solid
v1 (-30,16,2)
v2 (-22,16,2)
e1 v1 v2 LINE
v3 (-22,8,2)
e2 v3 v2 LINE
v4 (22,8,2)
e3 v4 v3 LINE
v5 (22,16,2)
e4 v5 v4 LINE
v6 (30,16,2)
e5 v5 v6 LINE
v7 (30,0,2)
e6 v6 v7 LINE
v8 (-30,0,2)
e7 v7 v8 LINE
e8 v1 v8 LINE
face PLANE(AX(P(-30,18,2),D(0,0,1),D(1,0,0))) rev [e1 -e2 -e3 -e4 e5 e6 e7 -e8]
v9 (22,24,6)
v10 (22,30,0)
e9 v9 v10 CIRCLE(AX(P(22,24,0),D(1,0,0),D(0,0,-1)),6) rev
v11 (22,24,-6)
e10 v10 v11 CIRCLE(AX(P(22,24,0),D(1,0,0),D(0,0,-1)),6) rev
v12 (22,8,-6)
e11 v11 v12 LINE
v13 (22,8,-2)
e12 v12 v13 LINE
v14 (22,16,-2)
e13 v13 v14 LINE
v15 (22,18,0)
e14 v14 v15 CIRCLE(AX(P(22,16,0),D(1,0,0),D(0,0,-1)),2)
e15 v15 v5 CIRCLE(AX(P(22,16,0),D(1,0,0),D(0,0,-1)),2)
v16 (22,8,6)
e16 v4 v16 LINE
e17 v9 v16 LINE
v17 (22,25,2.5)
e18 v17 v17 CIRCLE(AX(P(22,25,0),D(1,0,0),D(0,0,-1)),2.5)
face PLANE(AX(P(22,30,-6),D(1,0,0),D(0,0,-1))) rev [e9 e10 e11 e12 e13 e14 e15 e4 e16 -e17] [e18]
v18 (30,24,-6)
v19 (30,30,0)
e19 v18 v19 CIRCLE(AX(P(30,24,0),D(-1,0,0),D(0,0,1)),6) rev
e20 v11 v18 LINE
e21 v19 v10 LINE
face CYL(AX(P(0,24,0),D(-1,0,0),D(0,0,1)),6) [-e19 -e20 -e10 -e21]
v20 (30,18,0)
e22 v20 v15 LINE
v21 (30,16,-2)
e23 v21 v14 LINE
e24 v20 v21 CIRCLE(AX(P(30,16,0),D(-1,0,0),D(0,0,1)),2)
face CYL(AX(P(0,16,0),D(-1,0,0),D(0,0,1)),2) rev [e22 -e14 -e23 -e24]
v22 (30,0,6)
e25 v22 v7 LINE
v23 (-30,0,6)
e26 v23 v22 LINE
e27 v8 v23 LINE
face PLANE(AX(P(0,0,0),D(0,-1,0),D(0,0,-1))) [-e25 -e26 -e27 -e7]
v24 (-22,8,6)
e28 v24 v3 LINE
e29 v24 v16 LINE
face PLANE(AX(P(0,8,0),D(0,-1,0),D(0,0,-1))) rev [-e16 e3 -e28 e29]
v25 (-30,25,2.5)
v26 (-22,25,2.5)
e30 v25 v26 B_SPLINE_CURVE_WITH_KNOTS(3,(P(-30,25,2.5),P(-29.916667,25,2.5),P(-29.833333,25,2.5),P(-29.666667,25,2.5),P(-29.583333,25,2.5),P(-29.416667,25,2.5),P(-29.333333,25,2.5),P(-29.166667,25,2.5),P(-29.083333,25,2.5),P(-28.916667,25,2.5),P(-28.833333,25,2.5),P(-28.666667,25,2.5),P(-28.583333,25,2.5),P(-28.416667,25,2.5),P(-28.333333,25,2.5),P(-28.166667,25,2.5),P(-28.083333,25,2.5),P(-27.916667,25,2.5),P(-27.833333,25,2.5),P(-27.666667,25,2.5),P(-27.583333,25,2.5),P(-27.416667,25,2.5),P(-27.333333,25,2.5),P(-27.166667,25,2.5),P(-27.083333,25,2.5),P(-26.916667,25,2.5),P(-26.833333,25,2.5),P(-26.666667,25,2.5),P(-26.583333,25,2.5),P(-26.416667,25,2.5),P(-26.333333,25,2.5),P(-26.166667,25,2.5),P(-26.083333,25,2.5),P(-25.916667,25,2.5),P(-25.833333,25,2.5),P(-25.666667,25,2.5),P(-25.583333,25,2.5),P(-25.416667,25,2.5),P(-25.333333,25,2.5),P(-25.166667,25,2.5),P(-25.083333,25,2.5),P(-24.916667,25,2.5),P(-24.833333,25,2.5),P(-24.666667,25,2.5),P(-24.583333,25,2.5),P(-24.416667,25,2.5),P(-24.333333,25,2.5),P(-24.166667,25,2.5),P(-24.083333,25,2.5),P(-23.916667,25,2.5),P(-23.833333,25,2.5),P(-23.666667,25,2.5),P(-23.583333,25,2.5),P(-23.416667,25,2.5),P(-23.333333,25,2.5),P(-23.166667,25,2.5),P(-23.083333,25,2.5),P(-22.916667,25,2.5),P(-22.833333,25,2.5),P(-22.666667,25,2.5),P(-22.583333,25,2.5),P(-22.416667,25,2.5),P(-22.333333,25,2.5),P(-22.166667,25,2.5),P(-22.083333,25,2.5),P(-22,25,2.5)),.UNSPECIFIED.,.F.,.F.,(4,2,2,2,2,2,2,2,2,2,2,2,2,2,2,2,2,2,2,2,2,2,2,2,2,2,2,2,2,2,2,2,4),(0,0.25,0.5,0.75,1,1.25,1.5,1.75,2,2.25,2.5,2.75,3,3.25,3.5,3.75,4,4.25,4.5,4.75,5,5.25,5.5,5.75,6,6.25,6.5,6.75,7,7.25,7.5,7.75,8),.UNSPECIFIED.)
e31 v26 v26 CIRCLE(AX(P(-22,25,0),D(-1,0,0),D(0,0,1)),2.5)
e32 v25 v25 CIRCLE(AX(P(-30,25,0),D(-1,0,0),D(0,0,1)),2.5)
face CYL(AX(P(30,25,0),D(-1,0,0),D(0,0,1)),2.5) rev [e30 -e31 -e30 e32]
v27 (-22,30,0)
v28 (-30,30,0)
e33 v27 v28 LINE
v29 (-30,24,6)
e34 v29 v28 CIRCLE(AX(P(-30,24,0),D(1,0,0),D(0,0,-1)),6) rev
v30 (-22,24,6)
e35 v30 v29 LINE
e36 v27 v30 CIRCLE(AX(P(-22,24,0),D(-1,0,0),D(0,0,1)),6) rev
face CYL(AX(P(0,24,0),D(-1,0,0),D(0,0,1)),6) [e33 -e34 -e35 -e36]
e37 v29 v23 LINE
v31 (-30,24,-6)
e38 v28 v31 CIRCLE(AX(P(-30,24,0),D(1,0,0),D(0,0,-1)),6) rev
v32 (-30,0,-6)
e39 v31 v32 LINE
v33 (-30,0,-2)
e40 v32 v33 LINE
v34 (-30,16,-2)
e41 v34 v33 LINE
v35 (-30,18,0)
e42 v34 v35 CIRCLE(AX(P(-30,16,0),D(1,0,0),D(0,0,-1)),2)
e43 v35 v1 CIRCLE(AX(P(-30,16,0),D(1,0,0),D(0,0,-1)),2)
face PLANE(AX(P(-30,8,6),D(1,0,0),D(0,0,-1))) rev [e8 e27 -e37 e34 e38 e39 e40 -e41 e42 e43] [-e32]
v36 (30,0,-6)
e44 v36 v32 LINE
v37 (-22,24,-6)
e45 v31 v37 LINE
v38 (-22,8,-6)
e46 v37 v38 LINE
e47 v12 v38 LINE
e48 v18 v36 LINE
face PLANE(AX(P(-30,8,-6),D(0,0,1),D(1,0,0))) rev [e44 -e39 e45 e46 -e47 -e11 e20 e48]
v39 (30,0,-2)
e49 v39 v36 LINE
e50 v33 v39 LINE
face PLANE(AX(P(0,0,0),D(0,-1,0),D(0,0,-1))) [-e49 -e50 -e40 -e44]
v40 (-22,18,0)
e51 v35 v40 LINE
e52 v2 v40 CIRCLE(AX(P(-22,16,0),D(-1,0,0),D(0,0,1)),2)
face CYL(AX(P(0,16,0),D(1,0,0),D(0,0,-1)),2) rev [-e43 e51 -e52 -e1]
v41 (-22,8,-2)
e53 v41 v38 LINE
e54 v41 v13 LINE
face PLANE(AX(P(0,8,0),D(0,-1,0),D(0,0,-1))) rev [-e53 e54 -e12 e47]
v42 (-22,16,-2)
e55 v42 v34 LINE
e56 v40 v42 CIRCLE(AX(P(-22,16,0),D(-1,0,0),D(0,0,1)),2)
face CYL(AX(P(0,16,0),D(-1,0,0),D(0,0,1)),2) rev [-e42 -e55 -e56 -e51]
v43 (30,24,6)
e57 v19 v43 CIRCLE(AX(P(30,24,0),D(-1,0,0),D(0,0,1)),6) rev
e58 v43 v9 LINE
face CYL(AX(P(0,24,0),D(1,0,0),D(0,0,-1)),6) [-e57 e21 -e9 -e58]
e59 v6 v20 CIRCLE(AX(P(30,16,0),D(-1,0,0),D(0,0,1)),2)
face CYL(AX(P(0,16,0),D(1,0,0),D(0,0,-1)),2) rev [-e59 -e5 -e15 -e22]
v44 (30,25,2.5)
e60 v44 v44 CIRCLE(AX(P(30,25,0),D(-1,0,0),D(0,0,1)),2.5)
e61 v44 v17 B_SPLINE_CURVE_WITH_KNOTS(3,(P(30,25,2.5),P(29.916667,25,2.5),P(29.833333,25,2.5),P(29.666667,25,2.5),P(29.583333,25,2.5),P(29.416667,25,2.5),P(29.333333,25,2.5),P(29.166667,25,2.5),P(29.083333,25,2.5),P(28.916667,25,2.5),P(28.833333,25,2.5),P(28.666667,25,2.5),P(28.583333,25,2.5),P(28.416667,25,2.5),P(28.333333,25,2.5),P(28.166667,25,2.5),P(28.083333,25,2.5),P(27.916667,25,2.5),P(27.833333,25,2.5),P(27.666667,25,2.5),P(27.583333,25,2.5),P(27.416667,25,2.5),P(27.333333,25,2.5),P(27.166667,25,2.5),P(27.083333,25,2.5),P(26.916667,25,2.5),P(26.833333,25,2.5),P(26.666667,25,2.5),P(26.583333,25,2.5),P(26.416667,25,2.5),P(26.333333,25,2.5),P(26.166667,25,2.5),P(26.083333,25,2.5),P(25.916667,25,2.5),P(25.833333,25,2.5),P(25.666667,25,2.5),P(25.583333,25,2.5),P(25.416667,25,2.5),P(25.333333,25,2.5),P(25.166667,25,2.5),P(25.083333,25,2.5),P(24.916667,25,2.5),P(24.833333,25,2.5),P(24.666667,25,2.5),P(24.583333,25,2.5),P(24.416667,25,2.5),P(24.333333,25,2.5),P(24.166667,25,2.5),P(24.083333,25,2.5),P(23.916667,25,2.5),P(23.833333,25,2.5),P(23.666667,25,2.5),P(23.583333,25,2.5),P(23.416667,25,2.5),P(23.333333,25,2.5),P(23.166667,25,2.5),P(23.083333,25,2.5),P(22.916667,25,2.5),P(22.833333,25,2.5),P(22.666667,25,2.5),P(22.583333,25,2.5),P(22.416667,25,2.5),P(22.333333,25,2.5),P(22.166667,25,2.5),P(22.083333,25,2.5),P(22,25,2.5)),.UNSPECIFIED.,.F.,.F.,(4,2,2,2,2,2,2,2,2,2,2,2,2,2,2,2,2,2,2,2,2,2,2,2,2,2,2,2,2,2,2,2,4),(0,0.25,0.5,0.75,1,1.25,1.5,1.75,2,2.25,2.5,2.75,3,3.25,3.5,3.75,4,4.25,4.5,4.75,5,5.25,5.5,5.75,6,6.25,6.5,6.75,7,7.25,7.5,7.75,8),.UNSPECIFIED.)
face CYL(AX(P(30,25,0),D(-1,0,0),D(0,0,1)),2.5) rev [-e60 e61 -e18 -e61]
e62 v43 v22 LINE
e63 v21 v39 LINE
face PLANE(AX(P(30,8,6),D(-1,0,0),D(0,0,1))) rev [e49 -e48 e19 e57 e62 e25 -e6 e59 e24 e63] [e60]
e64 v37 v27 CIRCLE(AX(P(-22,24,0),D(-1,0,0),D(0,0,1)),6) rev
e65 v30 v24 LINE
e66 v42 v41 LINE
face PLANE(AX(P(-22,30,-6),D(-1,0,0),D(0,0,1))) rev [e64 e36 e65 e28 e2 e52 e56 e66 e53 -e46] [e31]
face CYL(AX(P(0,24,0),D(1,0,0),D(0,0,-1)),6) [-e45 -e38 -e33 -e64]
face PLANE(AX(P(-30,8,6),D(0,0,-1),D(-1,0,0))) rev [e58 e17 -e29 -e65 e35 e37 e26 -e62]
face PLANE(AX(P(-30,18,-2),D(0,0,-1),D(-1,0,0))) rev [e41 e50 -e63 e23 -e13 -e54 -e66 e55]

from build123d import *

# Parameters (mm, degrees)
SKETCH1_W           = 60
SKETCH1_H           = 12
BOSS_EXTRUDE1_DEPTH = 8
SKETCH2_W           = 8
SKETCH2_H           = 12
BOSS_EXTRUDE2_DEPTH = 22
SKETCH3_R           = 2.5
CUT_EXTRUDE1_DEPTH  = 68.349832962
FILLET1_R           = 6
SKETCH5_W           = 60
SKETCH5_H           = 4
CUT_EXTRUDE2_DEPTH  = 18
FILLET2_R           = 2


with BuildPart() as part:
    # Sketch1 → Boss-Extrude1 (new body)
    with BuildSketch(Plane(origin=(0, 0, 0), x_dir=(1, 0, 0), z_dir=(0, 1, 0))):
        Rectangle(SKETCH1_W, SKETCH1_H)
    extrude(amount=BOSS_EXTRUDE1_DEPTH)

    # Sketch2 → Boss-Extrude2 (add)
    with BuildSketch(Plane(origin=(0, 8, 0), x_dir=(1, 0, 0), z_dir=(0, 1, 0))):
        with Locations((-26, 0)):
            Rectangle(SKETCH2_W, SKETCH2_H)
        with Locations((26, 0)):
            Rectangle(SKETCH2_W, SKETCH2_H)
    extrude(amount=BOSS_EXTRUDE2_DEPTH)

    # Sketch3 → Cut-Extrude1 (cut, through all)
    with BuildSketch(Plane.ZY.offset(30)):
        with Locations((0, 25)):
            Circle(SKETCH3_R)
    extrude(amount=-CUT_EXTRUDE1_DEPTH, mode=Mode.SUBTRACT)

    # Fillet1
    fillet1_edges = [part.edges().sort_by_distance(p)[0] for p in [
        (-26, 30, 6),
        (26, 30, 6),
        (26, 30, -6),
        (-26, 30, -6),
    ]]
    fillet(fillet1_edges, radius=FILLET1_R - 0.0001)  # a hair under: the kernel refuses the full size

    # Sketch5 → Cut-Extrude2 (cut)
    with BuildSketch(Plane.XZ):
        Rectangle(SKETCH5_W, SKETCH5_H)
    extrude(amount=-CUT_EXTRUDE2_DEPTH, mode=Mode.SUBTRACT)

    # Fillet2
    fillet2_edges = [part.edges().sort_by_distance(p)[0] for p in [
        (-26, 18, 2),
        (-26, 18, -2),
        (26, 18, -2),
        (26, 18, 2),
    ]]
    fillet(fillet2_edges, radius=FILLET2_R - 0.0001)  # a hair under: the kernel refuses the full size


solid = part.part
